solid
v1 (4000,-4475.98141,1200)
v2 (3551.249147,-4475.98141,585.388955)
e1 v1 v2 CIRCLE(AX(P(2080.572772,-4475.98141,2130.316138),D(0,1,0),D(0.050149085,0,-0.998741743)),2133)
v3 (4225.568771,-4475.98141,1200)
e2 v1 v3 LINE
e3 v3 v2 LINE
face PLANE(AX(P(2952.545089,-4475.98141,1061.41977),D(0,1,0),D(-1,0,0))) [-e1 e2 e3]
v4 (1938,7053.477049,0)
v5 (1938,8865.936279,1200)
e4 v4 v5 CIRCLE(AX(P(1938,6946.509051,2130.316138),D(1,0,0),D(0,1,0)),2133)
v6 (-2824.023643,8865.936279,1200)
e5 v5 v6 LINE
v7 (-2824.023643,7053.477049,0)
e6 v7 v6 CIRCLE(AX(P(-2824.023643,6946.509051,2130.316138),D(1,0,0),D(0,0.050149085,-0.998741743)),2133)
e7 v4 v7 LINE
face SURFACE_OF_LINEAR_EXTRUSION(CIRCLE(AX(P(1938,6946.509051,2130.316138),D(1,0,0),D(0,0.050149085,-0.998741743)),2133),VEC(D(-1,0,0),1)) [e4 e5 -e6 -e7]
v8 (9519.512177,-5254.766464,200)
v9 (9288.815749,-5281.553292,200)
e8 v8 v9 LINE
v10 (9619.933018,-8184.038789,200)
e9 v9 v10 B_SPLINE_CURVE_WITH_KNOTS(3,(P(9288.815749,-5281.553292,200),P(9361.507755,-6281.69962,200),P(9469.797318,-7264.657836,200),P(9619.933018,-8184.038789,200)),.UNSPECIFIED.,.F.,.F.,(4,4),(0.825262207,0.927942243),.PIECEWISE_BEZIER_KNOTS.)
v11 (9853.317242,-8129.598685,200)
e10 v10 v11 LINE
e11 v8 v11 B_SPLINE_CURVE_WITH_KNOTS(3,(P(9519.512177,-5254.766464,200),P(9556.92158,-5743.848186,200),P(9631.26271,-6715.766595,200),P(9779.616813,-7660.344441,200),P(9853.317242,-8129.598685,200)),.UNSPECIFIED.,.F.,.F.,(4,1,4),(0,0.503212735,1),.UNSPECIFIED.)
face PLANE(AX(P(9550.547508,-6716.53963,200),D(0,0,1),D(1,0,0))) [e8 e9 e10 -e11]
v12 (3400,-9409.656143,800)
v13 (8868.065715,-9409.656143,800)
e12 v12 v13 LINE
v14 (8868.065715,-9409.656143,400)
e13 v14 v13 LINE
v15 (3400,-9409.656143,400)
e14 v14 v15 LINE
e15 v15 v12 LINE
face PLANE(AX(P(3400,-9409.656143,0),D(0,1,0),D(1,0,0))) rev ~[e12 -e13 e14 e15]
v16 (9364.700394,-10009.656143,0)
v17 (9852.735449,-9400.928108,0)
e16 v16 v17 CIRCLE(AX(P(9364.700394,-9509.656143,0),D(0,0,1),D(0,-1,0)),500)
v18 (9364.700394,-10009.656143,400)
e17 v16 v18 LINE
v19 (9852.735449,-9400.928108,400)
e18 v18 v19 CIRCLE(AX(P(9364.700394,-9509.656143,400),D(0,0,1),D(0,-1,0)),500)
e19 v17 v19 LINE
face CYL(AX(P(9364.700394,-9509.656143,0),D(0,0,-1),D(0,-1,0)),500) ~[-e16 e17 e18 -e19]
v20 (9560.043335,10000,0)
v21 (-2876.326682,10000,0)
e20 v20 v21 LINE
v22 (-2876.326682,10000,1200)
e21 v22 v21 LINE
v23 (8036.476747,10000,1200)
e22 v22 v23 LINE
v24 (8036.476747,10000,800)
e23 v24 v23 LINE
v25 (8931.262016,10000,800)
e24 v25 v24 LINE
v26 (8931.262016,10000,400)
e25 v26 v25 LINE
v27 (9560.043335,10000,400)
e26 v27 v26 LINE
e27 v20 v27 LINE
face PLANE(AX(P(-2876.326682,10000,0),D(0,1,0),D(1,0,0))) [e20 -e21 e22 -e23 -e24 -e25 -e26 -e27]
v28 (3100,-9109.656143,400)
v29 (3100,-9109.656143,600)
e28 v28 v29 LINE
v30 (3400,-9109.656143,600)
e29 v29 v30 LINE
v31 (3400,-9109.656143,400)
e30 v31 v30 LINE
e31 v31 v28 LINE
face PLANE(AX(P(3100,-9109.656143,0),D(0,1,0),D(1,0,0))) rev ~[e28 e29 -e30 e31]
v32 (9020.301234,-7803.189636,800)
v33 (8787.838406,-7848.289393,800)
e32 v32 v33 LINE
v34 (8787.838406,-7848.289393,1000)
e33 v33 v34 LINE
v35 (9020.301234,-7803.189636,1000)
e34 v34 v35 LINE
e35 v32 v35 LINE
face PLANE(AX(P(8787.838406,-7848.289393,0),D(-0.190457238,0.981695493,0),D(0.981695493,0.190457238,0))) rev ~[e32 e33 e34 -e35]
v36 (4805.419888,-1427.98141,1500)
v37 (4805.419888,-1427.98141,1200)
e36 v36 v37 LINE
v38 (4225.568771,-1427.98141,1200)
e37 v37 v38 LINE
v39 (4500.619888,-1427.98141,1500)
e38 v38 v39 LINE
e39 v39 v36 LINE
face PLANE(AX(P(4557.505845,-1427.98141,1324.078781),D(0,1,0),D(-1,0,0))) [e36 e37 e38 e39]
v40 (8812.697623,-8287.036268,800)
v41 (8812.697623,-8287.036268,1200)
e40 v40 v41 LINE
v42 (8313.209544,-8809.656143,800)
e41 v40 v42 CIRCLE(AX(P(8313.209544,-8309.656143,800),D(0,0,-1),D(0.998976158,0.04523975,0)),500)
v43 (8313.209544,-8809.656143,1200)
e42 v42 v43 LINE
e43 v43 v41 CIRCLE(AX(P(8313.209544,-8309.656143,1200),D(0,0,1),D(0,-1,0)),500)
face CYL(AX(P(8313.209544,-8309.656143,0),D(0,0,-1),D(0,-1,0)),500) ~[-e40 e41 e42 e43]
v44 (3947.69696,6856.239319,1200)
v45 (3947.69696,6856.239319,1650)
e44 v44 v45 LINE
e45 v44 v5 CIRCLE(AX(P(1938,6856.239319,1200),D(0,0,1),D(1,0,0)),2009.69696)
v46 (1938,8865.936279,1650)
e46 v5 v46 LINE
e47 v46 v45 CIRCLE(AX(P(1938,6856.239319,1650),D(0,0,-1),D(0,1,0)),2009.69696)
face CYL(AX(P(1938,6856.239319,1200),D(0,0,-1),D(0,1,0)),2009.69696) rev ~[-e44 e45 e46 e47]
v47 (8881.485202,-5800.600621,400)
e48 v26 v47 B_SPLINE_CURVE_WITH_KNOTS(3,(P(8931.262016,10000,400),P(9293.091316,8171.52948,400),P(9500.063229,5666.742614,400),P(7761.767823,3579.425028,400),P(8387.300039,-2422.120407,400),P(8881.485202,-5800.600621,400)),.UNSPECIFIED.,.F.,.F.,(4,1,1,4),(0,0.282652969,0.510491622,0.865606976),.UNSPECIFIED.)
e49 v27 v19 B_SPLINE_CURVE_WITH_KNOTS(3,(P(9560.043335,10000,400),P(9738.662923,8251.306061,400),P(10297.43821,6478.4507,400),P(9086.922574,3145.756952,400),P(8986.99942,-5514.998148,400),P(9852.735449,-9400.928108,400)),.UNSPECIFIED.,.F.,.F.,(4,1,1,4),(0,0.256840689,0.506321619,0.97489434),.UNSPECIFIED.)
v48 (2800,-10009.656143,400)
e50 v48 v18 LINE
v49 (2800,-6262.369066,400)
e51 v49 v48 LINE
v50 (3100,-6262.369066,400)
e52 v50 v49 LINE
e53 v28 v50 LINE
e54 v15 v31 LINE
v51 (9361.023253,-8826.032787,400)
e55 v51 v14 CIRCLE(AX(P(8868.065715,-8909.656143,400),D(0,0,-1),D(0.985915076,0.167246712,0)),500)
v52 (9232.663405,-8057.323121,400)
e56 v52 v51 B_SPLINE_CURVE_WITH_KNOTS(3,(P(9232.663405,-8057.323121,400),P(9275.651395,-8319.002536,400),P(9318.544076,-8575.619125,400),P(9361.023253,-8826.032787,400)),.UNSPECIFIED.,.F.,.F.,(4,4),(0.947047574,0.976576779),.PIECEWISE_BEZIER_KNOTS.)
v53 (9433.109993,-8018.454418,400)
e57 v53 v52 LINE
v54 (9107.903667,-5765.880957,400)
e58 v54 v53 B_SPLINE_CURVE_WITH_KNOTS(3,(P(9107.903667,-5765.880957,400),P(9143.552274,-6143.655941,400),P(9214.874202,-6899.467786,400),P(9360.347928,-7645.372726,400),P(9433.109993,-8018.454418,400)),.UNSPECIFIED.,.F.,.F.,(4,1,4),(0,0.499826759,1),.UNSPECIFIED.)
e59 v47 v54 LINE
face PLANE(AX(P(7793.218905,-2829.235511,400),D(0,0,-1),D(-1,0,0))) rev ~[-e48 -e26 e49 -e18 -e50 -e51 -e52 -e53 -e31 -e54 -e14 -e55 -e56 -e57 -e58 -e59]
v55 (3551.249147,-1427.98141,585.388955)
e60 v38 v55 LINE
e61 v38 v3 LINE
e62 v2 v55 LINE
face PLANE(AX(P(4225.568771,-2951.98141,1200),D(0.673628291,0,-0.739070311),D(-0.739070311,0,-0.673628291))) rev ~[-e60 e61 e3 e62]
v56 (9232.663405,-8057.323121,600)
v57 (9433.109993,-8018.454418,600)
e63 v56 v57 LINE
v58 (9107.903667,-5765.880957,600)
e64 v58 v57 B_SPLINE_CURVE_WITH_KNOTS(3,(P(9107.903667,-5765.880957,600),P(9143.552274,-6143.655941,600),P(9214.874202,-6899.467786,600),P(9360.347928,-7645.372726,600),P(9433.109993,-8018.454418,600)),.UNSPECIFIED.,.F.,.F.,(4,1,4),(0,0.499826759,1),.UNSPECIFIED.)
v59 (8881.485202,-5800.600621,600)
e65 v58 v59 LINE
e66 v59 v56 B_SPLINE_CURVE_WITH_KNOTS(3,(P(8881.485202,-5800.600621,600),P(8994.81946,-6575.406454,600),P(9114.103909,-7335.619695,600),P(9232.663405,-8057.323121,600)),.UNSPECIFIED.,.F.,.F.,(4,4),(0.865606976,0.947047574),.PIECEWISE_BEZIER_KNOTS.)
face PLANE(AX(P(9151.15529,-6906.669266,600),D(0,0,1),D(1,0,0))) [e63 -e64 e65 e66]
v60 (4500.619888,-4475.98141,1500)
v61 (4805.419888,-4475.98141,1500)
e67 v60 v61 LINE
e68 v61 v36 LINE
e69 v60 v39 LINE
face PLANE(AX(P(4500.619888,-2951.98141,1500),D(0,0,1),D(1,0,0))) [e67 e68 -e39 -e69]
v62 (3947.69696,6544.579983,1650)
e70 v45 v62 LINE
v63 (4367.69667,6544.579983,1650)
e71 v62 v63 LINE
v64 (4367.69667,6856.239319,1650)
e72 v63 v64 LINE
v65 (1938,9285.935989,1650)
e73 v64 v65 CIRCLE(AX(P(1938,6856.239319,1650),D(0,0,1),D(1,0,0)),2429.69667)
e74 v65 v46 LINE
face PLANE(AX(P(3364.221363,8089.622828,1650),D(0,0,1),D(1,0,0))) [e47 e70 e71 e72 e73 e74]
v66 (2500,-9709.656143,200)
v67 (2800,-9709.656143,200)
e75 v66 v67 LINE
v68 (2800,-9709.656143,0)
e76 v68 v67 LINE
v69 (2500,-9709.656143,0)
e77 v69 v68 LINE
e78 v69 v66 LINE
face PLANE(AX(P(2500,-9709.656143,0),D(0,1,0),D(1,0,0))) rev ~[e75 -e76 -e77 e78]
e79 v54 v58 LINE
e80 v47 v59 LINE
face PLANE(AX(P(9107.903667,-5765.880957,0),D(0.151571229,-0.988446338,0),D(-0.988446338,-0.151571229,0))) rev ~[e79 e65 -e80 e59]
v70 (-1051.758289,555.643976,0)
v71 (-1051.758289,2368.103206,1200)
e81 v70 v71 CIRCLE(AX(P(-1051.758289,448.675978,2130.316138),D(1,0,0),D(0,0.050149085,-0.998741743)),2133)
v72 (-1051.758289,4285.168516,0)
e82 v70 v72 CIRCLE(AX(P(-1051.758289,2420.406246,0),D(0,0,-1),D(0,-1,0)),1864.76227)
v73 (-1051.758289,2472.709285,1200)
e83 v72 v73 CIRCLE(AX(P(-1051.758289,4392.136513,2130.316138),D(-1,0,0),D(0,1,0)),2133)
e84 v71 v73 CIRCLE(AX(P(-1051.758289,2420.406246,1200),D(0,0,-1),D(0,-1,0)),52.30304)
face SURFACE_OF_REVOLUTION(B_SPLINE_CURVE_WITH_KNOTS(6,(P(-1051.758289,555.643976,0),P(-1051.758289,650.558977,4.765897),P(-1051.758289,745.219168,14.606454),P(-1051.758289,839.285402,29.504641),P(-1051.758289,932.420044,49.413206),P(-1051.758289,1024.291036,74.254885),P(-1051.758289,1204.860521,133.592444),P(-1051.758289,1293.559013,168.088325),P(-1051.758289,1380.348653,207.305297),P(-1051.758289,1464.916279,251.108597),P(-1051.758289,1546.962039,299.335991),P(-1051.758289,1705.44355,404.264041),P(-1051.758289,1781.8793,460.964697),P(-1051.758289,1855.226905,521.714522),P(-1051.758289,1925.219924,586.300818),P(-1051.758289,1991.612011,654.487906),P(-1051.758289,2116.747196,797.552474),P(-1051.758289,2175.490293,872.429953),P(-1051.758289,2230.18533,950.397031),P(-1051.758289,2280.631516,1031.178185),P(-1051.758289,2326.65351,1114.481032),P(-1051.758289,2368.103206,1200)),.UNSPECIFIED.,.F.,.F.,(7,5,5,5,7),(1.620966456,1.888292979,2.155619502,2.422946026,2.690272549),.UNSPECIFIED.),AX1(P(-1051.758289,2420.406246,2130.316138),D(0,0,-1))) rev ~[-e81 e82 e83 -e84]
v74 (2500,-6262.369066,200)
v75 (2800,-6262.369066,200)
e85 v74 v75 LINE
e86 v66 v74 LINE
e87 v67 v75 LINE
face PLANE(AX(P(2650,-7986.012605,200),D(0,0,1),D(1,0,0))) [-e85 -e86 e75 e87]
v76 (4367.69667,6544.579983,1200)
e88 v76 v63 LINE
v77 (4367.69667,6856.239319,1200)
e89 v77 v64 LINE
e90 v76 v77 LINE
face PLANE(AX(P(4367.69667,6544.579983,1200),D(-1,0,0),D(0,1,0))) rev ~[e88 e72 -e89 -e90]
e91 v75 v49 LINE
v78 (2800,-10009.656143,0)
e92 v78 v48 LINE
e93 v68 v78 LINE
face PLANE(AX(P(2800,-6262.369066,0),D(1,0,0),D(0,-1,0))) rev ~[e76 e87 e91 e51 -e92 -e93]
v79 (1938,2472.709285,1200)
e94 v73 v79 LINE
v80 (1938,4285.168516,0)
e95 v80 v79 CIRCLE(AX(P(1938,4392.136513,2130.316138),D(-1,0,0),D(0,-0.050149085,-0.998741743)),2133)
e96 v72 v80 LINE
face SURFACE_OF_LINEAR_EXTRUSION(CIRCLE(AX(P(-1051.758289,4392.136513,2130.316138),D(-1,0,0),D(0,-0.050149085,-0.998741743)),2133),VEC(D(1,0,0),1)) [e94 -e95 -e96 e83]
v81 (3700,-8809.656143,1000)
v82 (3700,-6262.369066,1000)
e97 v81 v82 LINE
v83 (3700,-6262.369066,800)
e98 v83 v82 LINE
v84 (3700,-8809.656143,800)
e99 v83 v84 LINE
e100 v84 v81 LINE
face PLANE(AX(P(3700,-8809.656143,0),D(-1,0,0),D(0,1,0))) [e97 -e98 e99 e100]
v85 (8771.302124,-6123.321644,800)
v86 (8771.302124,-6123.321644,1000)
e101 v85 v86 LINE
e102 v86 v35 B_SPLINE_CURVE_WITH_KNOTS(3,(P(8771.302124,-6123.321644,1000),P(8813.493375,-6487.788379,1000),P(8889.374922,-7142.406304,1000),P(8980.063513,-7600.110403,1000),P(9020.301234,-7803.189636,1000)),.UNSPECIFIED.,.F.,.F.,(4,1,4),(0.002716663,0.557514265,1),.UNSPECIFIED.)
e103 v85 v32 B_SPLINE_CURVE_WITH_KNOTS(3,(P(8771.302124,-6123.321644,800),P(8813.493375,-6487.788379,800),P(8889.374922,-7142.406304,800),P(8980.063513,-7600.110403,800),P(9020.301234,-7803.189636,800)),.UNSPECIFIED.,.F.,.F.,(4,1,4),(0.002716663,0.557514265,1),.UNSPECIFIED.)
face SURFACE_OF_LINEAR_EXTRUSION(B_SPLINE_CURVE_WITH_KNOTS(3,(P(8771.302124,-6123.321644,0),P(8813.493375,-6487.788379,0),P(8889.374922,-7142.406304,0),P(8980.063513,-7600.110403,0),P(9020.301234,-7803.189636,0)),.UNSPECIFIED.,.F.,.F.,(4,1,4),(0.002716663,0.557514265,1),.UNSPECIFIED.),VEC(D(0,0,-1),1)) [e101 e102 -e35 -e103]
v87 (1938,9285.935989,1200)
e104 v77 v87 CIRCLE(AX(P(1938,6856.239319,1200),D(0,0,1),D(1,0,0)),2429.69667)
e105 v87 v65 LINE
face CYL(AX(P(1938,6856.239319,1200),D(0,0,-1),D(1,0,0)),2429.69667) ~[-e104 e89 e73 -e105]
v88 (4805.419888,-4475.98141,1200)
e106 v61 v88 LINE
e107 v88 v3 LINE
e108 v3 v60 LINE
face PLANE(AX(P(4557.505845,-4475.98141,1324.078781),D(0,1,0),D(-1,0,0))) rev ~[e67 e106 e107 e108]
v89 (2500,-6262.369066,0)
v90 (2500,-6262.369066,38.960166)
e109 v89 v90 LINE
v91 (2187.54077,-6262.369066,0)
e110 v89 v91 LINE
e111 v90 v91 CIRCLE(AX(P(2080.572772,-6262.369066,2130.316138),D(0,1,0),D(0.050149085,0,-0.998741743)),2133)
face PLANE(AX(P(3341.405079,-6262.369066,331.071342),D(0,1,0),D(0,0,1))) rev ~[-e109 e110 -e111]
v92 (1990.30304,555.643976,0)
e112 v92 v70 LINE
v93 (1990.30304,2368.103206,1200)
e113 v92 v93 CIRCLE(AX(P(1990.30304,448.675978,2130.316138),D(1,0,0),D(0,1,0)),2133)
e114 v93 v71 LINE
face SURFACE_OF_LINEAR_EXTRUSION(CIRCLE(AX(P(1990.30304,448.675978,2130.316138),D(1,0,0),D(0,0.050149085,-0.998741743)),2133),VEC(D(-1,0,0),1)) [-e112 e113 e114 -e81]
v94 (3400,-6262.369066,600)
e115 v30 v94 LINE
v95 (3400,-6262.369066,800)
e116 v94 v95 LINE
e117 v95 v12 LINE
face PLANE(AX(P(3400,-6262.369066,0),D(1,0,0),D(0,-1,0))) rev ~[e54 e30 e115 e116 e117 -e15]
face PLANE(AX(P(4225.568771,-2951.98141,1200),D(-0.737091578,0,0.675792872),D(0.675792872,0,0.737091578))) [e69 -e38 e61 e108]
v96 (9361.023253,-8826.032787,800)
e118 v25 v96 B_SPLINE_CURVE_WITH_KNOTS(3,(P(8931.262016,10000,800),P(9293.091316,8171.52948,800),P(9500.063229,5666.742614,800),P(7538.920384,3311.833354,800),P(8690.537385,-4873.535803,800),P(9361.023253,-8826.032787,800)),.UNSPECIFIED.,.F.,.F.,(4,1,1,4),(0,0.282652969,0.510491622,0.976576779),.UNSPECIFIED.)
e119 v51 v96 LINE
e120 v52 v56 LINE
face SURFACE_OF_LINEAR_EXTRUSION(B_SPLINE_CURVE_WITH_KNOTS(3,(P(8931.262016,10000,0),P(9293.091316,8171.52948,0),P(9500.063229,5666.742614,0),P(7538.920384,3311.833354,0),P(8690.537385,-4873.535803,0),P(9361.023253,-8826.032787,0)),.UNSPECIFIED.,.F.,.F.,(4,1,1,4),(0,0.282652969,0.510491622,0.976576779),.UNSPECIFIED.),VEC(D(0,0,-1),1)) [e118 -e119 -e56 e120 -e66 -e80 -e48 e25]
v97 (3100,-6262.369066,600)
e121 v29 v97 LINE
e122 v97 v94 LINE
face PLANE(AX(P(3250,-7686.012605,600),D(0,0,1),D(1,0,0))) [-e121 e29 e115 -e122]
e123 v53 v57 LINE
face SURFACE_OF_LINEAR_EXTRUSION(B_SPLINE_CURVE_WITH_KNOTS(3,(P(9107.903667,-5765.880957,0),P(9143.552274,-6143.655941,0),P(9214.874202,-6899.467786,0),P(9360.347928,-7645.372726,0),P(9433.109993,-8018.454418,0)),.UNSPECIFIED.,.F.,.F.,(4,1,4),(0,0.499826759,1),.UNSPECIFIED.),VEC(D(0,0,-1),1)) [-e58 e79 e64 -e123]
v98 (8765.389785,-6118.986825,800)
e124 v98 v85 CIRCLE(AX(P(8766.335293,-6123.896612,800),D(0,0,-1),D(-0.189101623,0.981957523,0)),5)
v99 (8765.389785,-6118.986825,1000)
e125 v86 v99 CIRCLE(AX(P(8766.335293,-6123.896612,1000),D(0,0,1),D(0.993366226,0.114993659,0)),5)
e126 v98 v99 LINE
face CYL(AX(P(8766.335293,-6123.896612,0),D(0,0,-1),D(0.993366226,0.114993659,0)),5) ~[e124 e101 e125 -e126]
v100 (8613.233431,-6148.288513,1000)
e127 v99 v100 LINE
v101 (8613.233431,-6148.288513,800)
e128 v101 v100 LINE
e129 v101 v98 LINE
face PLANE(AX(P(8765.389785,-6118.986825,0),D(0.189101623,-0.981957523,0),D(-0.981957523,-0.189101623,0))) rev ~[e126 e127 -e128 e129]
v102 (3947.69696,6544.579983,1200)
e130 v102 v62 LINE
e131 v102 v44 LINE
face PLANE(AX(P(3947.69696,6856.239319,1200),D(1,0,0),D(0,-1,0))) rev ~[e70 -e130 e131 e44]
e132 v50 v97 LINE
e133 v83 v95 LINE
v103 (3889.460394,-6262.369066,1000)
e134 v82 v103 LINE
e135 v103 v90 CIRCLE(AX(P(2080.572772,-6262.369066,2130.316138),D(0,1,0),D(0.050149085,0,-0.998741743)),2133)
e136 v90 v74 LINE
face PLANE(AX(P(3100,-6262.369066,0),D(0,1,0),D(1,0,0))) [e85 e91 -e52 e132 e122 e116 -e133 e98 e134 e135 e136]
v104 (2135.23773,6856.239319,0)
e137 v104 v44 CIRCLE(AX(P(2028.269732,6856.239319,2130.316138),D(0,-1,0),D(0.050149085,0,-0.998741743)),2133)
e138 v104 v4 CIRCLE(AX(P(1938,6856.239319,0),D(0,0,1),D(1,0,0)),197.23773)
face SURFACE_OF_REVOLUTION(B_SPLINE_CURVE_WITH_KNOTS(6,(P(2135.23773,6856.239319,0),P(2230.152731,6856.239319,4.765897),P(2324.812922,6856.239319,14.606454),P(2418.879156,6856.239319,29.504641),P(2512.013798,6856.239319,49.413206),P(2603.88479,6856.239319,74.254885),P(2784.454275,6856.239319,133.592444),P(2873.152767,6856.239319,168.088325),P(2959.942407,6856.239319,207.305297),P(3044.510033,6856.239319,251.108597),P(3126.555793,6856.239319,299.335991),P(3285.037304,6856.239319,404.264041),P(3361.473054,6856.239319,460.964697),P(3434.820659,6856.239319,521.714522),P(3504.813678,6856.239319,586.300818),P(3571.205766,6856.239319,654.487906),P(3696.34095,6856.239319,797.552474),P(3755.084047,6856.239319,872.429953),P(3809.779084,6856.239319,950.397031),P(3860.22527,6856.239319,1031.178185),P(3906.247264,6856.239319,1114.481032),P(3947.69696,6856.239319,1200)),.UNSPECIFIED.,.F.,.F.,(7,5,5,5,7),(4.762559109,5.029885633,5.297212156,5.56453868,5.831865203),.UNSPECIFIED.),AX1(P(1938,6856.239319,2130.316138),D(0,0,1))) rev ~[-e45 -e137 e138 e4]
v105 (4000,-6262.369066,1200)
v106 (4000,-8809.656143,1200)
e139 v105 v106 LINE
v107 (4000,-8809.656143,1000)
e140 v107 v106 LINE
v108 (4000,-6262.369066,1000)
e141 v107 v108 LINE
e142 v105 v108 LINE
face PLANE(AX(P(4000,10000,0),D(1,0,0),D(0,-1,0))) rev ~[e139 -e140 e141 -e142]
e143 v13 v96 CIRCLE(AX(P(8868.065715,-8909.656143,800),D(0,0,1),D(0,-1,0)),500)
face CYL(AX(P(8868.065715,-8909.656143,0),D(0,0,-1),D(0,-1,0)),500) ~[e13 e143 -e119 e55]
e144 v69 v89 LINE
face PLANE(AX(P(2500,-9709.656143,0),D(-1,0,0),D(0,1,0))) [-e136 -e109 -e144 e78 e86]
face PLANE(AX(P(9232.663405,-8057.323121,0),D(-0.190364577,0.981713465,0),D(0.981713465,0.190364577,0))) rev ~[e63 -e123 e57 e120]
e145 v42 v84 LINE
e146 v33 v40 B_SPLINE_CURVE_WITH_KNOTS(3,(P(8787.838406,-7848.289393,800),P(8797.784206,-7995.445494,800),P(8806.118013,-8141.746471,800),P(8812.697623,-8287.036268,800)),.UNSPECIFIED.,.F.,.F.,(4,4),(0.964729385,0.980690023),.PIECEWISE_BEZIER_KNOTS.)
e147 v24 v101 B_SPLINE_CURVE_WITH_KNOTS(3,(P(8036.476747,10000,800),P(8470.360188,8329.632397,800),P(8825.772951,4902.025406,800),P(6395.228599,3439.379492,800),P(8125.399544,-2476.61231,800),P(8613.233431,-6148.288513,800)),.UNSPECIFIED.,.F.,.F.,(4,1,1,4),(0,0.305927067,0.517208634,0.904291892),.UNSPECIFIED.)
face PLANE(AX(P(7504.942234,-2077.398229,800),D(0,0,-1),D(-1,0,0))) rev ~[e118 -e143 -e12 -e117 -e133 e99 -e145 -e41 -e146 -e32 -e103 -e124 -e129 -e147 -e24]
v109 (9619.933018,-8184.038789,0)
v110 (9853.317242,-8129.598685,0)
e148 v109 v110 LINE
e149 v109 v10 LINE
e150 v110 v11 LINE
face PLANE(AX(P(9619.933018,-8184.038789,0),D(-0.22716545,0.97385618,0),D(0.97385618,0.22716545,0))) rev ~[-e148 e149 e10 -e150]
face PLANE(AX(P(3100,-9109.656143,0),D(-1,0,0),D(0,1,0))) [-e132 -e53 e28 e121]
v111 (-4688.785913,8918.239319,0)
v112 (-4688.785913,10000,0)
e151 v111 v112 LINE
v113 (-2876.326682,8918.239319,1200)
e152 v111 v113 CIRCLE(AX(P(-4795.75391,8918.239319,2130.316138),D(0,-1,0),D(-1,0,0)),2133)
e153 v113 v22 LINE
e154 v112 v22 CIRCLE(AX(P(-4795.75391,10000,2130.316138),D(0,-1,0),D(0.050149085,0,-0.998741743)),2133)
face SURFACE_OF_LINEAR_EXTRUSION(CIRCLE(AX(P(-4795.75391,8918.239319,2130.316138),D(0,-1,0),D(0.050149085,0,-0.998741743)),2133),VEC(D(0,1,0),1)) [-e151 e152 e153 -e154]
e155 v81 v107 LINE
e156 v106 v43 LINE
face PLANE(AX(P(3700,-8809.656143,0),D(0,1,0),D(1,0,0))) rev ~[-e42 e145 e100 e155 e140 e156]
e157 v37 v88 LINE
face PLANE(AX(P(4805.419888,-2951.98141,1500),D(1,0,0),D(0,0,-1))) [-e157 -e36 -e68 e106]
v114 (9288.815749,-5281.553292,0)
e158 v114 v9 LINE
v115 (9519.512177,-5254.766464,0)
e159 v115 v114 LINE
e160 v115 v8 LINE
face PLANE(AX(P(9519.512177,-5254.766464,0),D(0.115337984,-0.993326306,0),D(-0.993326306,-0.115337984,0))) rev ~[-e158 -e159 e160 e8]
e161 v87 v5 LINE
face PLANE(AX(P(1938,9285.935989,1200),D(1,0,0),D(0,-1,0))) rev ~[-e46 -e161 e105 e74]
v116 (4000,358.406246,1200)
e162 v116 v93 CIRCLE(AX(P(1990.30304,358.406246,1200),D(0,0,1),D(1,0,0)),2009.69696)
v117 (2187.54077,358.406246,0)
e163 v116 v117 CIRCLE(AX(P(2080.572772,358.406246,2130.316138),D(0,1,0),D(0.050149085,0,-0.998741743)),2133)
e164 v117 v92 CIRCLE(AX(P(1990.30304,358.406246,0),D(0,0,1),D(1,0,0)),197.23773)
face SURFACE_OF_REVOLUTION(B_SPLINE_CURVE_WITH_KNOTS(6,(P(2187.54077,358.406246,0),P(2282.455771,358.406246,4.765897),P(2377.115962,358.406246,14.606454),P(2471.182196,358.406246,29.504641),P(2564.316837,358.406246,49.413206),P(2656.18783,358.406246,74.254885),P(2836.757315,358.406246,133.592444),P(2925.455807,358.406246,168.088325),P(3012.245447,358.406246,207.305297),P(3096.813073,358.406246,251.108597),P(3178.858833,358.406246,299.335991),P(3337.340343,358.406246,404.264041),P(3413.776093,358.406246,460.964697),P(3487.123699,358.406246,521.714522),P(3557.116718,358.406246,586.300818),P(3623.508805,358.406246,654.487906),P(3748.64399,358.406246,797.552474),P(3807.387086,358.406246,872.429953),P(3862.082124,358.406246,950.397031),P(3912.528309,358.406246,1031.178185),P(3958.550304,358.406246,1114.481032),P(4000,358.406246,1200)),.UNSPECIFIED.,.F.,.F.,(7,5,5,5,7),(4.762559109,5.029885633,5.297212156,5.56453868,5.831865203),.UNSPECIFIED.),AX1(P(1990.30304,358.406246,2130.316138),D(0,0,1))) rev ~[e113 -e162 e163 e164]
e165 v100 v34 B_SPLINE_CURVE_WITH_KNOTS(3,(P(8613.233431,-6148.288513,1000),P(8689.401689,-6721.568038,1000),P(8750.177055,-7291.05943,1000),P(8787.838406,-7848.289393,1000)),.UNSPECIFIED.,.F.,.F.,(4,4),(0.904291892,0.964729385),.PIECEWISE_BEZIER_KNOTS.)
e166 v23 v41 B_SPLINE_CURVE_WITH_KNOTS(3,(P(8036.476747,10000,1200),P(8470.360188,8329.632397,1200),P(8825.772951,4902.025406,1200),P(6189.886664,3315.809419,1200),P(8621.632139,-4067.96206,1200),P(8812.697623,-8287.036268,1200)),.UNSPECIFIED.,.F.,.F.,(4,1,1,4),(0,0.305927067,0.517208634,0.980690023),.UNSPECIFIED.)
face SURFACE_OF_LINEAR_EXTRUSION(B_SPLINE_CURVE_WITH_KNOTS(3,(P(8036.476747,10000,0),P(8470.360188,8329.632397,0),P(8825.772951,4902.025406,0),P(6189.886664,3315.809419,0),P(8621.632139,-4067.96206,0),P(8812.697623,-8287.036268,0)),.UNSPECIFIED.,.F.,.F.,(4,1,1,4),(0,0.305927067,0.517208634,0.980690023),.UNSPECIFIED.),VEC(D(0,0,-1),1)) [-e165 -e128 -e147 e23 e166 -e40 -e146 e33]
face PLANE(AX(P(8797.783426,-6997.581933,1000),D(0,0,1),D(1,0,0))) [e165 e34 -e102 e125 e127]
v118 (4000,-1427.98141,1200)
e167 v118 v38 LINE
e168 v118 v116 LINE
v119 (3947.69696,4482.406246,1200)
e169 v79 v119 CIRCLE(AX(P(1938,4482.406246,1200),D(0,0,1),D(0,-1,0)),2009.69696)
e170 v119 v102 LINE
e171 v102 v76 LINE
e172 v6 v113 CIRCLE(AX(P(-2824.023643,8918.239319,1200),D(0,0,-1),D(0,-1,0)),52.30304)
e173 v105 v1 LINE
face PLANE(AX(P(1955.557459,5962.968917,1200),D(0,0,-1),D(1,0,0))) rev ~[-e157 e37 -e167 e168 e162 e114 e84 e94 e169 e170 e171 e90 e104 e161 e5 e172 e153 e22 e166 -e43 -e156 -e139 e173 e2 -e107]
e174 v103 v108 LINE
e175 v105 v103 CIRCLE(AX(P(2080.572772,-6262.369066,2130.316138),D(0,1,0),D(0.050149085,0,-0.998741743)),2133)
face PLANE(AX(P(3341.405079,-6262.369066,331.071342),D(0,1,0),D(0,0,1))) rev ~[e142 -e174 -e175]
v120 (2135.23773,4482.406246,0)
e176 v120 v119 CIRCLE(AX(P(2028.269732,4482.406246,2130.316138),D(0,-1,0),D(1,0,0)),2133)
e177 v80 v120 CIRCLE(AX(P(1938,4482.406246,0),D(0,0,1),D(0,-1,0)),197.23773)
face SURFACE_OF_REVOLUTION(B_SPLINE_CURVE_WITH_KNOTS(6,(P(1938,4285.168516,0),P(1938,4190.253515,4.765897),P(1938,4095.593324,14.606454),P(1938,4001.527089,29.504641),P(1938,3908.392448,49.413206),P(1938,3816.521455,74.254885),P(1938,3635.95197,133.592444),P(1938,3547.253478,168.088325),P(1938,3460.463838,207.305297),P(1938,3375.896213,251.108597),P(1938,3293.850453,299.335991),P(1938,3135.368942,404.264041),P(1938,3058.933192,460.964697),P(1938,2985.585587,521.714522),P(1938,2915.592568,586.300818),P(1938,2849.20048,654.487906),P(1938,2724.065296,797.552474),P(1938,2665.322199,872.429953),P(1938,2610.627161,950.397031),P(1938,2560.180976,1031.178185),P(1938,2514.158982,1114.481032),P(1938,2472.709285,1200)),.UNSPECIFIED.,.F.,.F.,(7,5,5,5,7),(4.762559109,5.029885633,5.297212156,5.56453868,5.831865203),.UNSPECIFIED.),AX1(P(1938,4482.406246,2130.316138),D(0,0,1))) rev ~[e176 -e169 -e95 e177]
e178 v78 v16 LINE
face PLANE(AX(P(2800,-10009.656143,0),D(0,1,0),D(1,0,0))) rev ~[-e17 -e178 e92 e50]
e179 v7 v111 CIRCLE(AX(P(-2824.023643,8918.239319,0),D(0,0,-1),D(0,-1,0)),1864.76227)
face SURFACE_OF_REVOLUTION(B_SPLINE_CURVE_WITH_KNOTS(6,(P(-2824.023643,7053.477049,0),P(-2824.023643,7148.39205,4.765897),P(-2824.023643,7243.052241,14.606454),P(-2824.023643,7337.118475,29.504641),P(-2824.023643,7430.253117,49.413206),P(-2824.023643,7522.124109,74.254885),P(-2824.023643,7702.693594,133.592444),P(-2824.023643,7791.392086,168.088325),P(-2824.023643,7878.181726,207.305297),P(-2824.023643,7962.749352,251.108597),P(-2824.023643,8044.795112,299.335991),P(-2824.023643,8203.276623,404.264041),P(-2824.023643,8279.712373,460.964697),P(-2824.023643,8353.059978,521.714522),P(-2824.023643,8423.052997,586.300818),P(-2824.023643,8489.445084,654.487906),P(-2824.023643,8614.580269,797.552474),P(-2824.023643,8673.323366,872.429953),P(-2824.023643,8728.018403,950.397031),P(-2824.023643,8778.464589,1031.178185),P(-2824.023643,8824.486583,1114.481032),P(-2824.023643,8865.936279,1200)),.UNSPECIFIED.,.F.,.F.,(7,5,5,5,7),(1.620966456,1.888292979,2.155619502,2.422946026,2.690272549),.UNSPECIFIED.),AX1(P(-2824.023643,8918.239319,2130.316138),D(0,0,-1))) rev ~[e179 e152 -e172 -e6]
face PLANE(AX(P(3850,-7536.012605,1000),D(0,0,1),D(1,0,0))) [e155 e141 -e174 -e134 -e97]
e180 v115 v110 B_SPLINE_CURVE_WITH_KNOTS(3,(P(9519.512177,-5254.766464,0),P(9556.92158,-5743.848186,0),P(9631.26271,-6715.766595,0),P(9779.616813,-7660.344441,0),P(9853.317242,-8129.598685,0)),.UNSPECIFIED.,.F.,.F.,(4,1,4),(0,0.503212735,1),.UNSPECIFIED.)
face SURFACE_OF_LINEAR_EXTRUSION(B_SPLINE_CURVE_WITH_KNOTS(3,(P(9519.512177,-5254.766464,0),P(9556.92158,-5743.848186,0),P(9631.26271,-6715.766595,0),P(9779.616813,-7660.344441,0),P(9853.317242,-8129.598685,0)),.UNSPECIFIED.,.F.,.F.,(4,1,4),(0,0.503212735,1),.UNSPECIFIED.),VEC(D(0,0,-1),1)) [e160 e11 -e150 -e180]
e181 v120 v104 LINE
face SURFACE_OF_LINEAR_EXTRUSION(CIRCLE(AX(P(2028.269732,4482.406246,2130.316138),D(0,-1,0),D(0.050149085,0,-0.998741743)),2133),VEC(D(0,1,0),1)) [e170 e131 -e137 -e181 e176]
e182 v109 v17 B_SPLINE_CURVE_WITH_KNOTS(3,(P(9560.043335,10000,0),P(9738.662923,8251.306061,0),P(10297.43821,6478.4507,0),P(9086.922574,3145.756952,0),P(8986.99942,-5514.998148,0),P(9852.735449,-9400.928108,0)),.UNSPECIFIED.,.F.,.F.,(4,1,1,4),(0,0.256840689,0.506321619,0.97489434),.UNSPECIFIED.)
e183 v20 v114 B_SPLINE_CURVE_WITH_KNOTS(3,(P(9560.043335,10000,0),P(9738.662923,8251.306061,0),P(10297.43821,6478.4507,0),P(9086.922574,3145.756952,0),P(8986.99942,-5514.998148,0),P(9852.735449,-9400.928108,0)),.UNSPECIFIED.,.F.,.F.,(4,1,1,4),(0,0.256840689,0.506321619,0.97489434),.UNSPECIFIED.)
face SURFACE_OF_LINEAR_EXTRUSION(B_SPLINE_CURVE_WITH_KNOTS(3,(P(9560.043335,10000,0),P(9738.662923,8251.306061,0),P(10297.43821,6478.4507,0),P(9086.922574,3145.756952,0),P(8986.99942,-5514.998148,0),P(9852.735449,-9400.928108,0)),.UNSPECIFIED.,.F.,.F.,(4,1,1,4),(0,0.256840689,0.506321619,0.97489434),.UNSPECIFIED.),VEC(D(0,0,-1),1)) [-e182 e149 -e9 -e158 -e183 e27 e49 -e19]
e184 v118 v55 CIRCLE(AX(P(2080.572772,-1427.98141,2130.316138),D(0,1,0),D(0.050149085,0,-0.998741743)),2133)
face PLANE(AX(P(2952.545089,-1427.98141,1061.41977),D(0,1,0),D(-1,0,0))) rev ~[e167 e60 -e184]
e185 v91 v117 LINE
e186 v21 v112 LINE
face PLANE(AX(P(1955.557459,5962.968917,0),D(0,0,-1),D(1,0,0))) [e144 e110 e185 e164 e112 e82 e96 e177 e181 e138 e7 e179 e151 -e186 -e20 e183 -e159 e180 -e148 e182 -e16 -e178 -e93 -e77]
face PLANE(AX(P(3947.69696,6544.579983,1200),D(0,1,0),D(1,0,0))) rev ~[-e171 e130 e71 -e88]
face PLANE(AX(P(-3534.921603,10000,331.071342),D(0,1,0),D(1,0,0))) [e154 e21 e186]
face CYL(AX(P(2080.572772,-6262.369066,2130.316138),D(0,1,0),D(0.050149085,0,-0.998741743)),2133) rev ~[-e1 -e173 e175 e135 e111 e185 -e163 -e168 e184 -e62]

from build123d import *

# Parameters (mm, degrees)
F1_DEPTH  = 1200
F0_W      = 300
F0_H      = 2547.2870769622
F2_DEPTH  = 1000
F3_DEPTH  = 800
F4_DEPTH  = 400
F0_H_2    = 3447.2870769622
F5_DEPTH  = 200
F0_H_3    = 2847.2870769622
F6_DEPTH  = 600
F7_DEPTH  = 200
F8_DEPTH  = 600
F9_DEPTH  = 1000
F16_DEPTH = 1524
F17_DEPTH = 1524
F19_DEPTH = 1200
F21_DEPTH = 450


# Not quite as in the source:
# - a feature names something its author has since deleted; it is built from what else it names


with BuildPart() as f1:
    # F0 (on Top) → F1 (new body)
    with BuildSketch(Plane.XY):
        with BuildLine():
            add(Edge.make_bspline(
                [(8036.4767474961, 10000), (8470.360187732, 8329.6323969196), (8825.7729510838, 4902.0254055318), (6395.2285988216, 3439.3794917817), (8125.3995442021, -2476.6123096312), (8613.2334310908, -6148.2885131691)],
                knots=[0, 0, 0, 0, 0.3059270672, 0.5172086345, 0.9042918919, 0.9042918919, 0.9042918919, 0.9042918919], degree=3))
            Line((8036.4767474961, 10000), (4000, 10000))
            Line((4000, 10000), (4000, -6262.3690662263))
            Line((4000, -6262.3690662263), (4000, -8809.6561431885))
            Line((4000, -8809.6561431885), (8313.2095440952, -8809.6561431885))
            ThreePointArc((8313.2095440952, -8809.6561431885), (8674.6718087547, -8655.1196452075), (8812.6976232832, -8287.0362680974))
            add(Edge.make_bspline(
                [(8787.8384059317, -7848.2893931684), (8797.784205551, -7995.4454937091), (8806.1180126829, -8141.7464710797), (8812.6976232832, -8287.0362680974)],
                knots=[0.9647293852, 0.9647293852, 0.9647293852, 0.9647293852, 0.9806900234, 0.9806900234, 0.9806900234, 0.9806900234], degree=3))
            add(Edge.make_bspline(
                [(8613.2334310908, -6148.2885131691), (8689.4016886612, -6721.5680378242), (8750.1770548915, -7291.0594295347), (8787.8384059317, -7848.2893931684)],
                knots=[0.9042918919, 0.9042918919, 0.9042918919, 0.9042918919, 0.9647293852, 0.9647293852, 0.9647293852, 0.9647293852], degree=3))
        make_face()
    extrude(amount=F1_DEPTH)

    # F0 (on Top) → F2 (join)
    with BuildSketch(Plane.XY):
        with Locations((3850, -7536.0126047074)):
            Rectangle(F0_W, F0_H)
    extrude(amount=F2_DEPTH)

    # F0 (on Top) → F3 (join)
    with BuildSketch(Plane.XY):
        with BuildLine():
            add(Edge.make_bspline(
                [(8931.2620162964, 10000), (9293.0913160754, 8171.5294795271), (9500.0632293716, 5666.7426139981), (7761.7678229589, 3579.4250276228), (8387.3000385547, -2422.1204070051), (8881.4852022515, -5800.6006208613)],
                knots=[0, 0, 0, 0, 0.2826529688, 0.5104916215, 0.8656069765, 0.8656069765, 0.8656069765, 0.8656069765], degree=3))
            Line((8931.2620162964, 10000), (8036.4767474961, 10000))
            add(Edge.make_bspline(
                [(8036.4767474961, 10000), (8470.360187732, 8329.6323969196), (8825.7729510838, 4902.0254055318), (6395.2285988216, 3439.3794917817), (8125.3995442021, -2476.6123096312), (8613.2334310908, -6148.2885131691)],
                knots=[0, 0, 0, 0, 0.3059270672, 0.5172086345, 0.9042918919, 0.9042918919, 0.9042918919, 0.9042918919], degree=3))
            Line((8613.2334310908, -6148.2885131691), (8765.3897849551, -6118.9868246126))
            ThreePointArc((8765.3897849551, -6118.9868246126), (8769.2917139348, -6119.8642958095), (8771.3021241999, -6123.3216439306))
            add(Edge.make_bspline(
                [(8771.3021241999, -6123.3216439306), (8813.4933748329, -6487.7883786699), (8889.3749215397, -7142.4063040065), (8980.0635134111, -7600.1104032829), (9020.3012339996, -7803.1896360599)],
                knots=[0.0027166629, 0.0027166629, 0.0027166629, 0.0027166629, 0.5575142646, 1, 1, 1, 1], degree=3))
            Line((9020.3012339996, -7803.1896360599), (8787.8384059317, -7848.2893931684))
            add(Edge.make_bspline(
                [(8787.8384059317, -7848.2893931684), (8797.784205551, -7995.4454937091), (8806.1180126829, -8141.7464710797), (8812.6976232832, -8287.0362680974)],
                knots=[0.9647293852, 0.9647293852, 0.9647293852, 0.9647293852, 0.9806900234, 0.9806900234, 0.9806900234, 0.9806900234], degree=3))
            ThreePointArc((8812.6976232832, -8287.0362680974), (8674.6718087547, -8655.1196452075), (8313.2095440952, -8809.6561431885))
            Line((8313.2095440952, -8809.6561431885), (4000, -8809.6561431885))
            Line((4000, -8809.6561431885), (3700, -8809.6561431885))
            Line((3700, -8809.6561431885), (3700, -6262.3690662263))
            Line((3700, -6262.3690662263), (3400, -6262.3690662263))
            Line((3400, -6262.3690662263), (3400, -9109.6561431885))
            Line((3400, -9109.6561431885), (3400, -9409.6561431885))
            Line((3400, -9409.6561431885), (8868.0657153652, -9409.6561431885))
            ThreePointArc((8868.0657153652, -9409.6561431885), (9250.0419437511, -9232.2924104432), (9361.0232533911, -8826.0327869808))
            add(Edge.make_bspline(
                [(9232.6634049447, -8057.3231214569), (9275.6513945538, -8319.0025360325), (9318.5440756349, -8575.6191246537), (9361.0232533911, -8826.0327869808)],
                knots=[0.9470475744, 0.9470475744, 0.9470475744, 0.9470475744, 0.9765767788, 0.9765767788, 0.9765767788, 0.9765767788], degree=3))
            add(Edge.make_bspline(
                [(8881.4852022515, -5800.6006208613), (8994.8194600953, -6575.4064543937), (9114.1039092929, -7335.6196946013), (9232.6634049447, -8057.3231214569)],
                knots=[0.8656069765, 0.8656069765, 0.8656069765, 0.8656069765, 0.9470475744, 0.9470475744, 0.9470475744, 0.9470475744], degree=3))
        make_face()
        with Locations((3850, -7536.0126047074)):
            Rectangle(F0_W, F0_H)
    extrude(amount=F3_DEPTH)

    # F0 (on Top) → F4 (join)
    with BuildSketch(Plane.XY):
        with BuildLine():
            add(Edge.make_bspline(
                [(9560.0433349609, 10000), (9738.6629226993, 8251.3060611052), (10297.4382102532, 6478.450699769), (9272.7191558649, 3657.2770747912), (9063.0227701453, -2174.939075243), (9288.8157490666, -5281.5532921831)],
                knots=[0, 0, 0, 0, 0.2568406889, 0.506321619, 0.8252622074, 0.8252622074, 0.8252622074, 0.8252622074], degree=3))
            Line((9560.0433349609, 10000), (8931.2620162964, 10000))
            add(Edge.make_bspline(
                [(8931.2620162964, 10000), (9293.0913160754, 8171.5294795271), (9500.0632293716, 5666.7426139981), (7761.7678229589, 3579.4250276228), (8387.3000385547, -2422.1204070051), (8881.4852022515, -5800.6006208613)],
                knots=[0, 0, 0, 0, 0.2826529688, 0.5104916215, 0.8656069765, 0.8656069765, 0.8656069765, 0.8656069765], degree=3))
            Line((8881.4852022515, -5800.6006208613), (9107.9036665642, -5765.8809567214))
            add(Edge.make_bspline(
                [(9107.9036665642, -5765.8809567214), (9143.5522743599, -6143.655941097), (9214.8742017644, -6899.4677855656), (9360.3479276578, -7645.3727259321), (9433.1099926681, -8018.4544176886)],
                knots=[0, 0, 0, 0, 0.4998267587, 1, 1, 1, 1], degree=3))
            Line((9433.1099926681, -8018.4544176886), (9232.6634049447, -8057.3231214569))
            add(Edge.make_bspline(
                [(9232.6634049447, -8057.3231214569), (9275.6513945538, -8319.0025360325), (9318.5440756349, -8575.6191246537), (9361.0232533911, -8826.0327869808)],
                knots=[0.9470475744, 0.9470475744, 0.9470475744, 0.9470475744, 0.9765767788, 0.9765767788, 0.9765767788, 0.9765767788], degree=3))
            ThreePointArc((9361.0232533911, -8826.0327869808), (9250.0419437511, -9232.2924104432), (8868.0657153652, -9409.6561431885))
            Line((8868.0657153652, -9409.6561431885), (3400, -9409.6561431885))
            Line((3400, -9409.6561431885), (3400, -9109.6561431885))
            Line((3400, -9109.6561431885), (3100, -9109.6561431885))
            Line((3100, -9109.6561431885), (3100, -6262.3690662263))
            Line((3100, -6262.3690662263), (2800, -6262.3690662263))
            Line((2800, -6262.3690662263), (2800, -9709.6561431885))
            Line((2800, -9709.6561431885), (2800, -10009.6561431885))
            Line((2800, -10009.6561431885), (9364.7003943114, -10009.6561431885))
            ThreePointArc((9364.7003943114, -10009.6561431885), (9754.8055196615, -9822.4148220059), (9852.735448729, -9400.928107891))
            add(Edge.make_bspline(
                [(9619.9330184672, -8184.0387894501), (9688.5849810725, -8604.4405106021), (9765.9866472577, -9011.5487180137), (9852.735448729, -9400.928107891)],
                knots=[0.927942243, 0.927942243, 0.927942243, 0.927942243, 0.9748943399, 0.9748943399, 0.9748943399, 0.9748943399], degree=3))
            add(Edge.make_bspline(
                [(9288.8157490666, -5281.5532921831), (9361.507754855, -6281.6996196687), (9469.7973180649, -7264.6578357211), (9619.9330184672, -8184.0387894501)],
                knots=[0.8252622074, 0.8252622074, 0.8252622074, 0.8252622074, 0.927942243, 0.927942243, 0.927942243, 0.927942243], degree=3))
        make_face()
    extrude(amount=F4_DEPTH)

    # F0 (on Top) → F5 (join)
    with BuildSketch(Plane.XY):
        with Locations((2650, -7986.0126047074)):
            Rectangle(F0_W, F0_H_2)
    extrude(amount=F5_DEPTH)

    # F0 (on Top) → F6 (join)
    with BuildSketch(Plane.XY):
        with Locations((3250, -7686.0126047074)):
            Rectangle(F0_W, F0_H_3)
    extrude(amount=F6_DEPTH)

    # F0 (on Top) → F7 (join)
    with BuildSketch(Plane.XY):
        with BuildLine():
            Line((9519.5121765137, -5254.7664642334), (9288.8157490666, -5281.5532921831))
            add(Edge.make_bspline(
                [(9288.8157490666, -5281.5532921831), (9361.507754855, -6281.6996196687), (9469.7973180649, -7264.6578357211), (9619.9330184672, -8184.0387894501)],
                knots=[0.8252622074, 0.8252622074, 0.8252622074, 0.8252622074, 0.927942243, 0.927942243, 0.927942243, 0.927942243], degree=3))
            Line((9619.9330184672, -8184.0387894501), (9853.3172420489, -8129.59868503))
            add(Edge.make_bspline(
                [(9519.5121765137, -5254.7664642334), (9556.921579776, -5743.8481856875), (9631.2627095363, -6715.7665951577), (9779.6168128683, -7660.3444408865), (9853.3172420489, -8129.59868503)],
                knots=[0, 0, 0, 0, 0.5032127354, 1, 1, 1, 1], degree=3))
        make_face()
    extrude(amount=F7_DEPTH)

    # F0 (on Top) → F8 (join)
    with BuildSketch(Plane.XY):
        with BuildLine():
            Line((9107.9036665642, -5765.8809567214), (8881.4852022515, -5800.6006208613))
            add(Edge.make_bspline(
                [(8881.4852022515, -5800.6006208613), (8994.8194600953, -6575.4064543937), (9114.1039092929, -7335.6196946013), (9232.6634049447, -8057.3231214569)],
                knots=[0.8656069765, 0.8656069765, 0.8656069765, 0.8656069765, 0.9470475744, 0.9470475744, 0.9470475744, 0.9470475744], degree=3))
            Line((9232.6634049447, -8057.3231214569), (9433.1099926681, -8018.4544176886))
            add(Edge.make_bspline(
                [(9107.9036665642, -5765.8809567214), (9143.5522743599, -6143.655941097), (9214.8742017644, -6899.4677855656), (9360.3479276578, -7645.3727259321), (9433.1099926681, -8018.4544176886)],
                knots=[0, 0, 0, 0, 0.4998267587, 1, 1, 1, 1], degree=3))
        make_face()
    extrude(amount=F8_DEPTH)

    # F0 (on Top) → F9 (join)
    with BuildSketch(Plane.XY):
        with BuildLine():
            Line((8765.3897849551, -6118.9868246126), (8613.2334310908, -6148.2885131691))
            add(Edge.make_bspline(
                [(8613.2334310908, -6148.2885131691), (8689.4016886612, -6721.5680378242), (8750.1770548915, -7291.0594295347), (8787.8384059317, -7848.2893931684)],
                knots=[0.9042918919, 0.9042918919, 0.9042918919, 0.9042918919, 0.9647293852, 0.9647293852, 0.9647293852, 0.9647293852], degree=3))
            Line((8787.8384059317, -7848.2893931684), (9020.3012339996, -7803.1896360599))
            add(Edge.make_bspline(
                [(8771.3021241999, -6123.3216439306), (8813.4933748329, -6487.7883786699), (8889.3749215397, -7142.4063040065), (8980.0635134111, -7600.1104032829), (9020.3012339996, -7803.1896360599)],
                knots=[0.0027166629, 0.0027166629, 0.0027166629, 0.0027166629, 0.5575142646, 1, 1, 1, 1], degree=3))
            ThreePointArc((8771.3021241999, -6123.3216439306), (8769.2917139348, -6119.8642958095), (8765.3897849551, -6118.9868246126))
        make_face()
    extrude(amount=F9_DEPTH)

    # F12: sweep along a path in F0
    with BuildLine(Plane.XY) as f12_path:
        Line((2240.3030395508, -6262.3690662263), (2240.3030395508, 358.4062457085))
        ThreePointArc((2240.3030395508, 358.4062457085), (2167.0797348474, 535.1829410051), (1990.3030395508, 608.4062457085))
        Line((1990.3030395508, 608.4062457085), (-1051.7582893372, 608.4062457085))
        ThreePointArc((-1051.7582893372, 608.4062457085), (-2863.7582893372, 2420.4062457085), (-1051.7582893372, 4232.4062457085))
        Line((-1051.7582893372, 4232.4062457085), (1938, 4232.4062457085))
        ThreePointArc((1938, 4232.4062457085), (2114.7766952966, 4305.6295504118), (2188, 4482.4062457085))
        Line((2188, 4482.4062457085), (2188, 6856.2393188477))
        ThreePointArc((2188, 6856.2393188477), (2114.7766952966, 7033.0160141443), (1938, 7106.2393188477))
        Line((1938, 7106.2393188477), (-2824.0236428859, 7106.2393188477))
        ThreePointArc((-2824.0236428859, 7106.2393188477), (-4105.3011303959, 7636.9618313376), (-4636.0236428859, 8918.2393188477))
        Line((-4636.0236428859, 8918.2393188477), (-4636.0236428859, 10000))
    # F11 (on line) → F12 (sweep)
    with BuildSketch(Plane(origin=(0, -6262.3690662263, 0), x_dir=(-1, 0, 0), z_dir=(0, 1, 0))):
        with BuildLine():
            ThreePointArc((-2187.540769577, 0), (-3258.099588071, 351.8000155689), (-4000, 1200))
            Line((-4000, 1200), (-4000, 1000))
            Line((-4000, 1000), (-4000, 0))
            Line((-4000, 0), (-2187.540769577, 0))
        make_face()
    sweep(path=f12_path.line)

    # F15 (on face) → F16 (join, symmetric)
    with BuildSketch(Plane(origin=(0, -2951.9814102589, 0), x_dir=(-1, 0, 0), z_dir=(0, 1, 0))):
        Polygon((-4225.5687713623, 1200), (-4500.6198883057, 1500), (-4805.4198883057, 1500), (-4805.4198883057, 1200), align=None)
    extrude(amount=F16_DEPTH, both=True)

    # F15 (on face) → F17 (cut, symmetric)
    with BuildSketch(Plane(origin=(0, -2951.9814102589, 0), x_dir=(-1, 0, 0), z_dir=(0, 1, 0))):
        Polygon((-3236.7072105408, 1854.6521663666), (-4225.5687713623, 1200), (-3485.6019020081, 525.5545377731), (-1603.2665967941, 735.3942990303), align=None)
    extrude(amount=F17_DEPTH, both=True, mode=Mode.SUBTRACT)

    # F18 (on face) → F19 (join)
    with BuildSketch(Plane(origin=(0, 0, 0), x_dir=(1, 0, 0), z_dir=(0, 0, -1))):
        with BuildLine():
            Line((-2876.3266824367, -10000), (4000, -10000))
            Line((4000, -10000), (4000, -358.4062457085))
            ThreePointArc((4000, -358.4062457085), (3411.3733884144, -1779.4765945721), (1990.3030395508, -2368.1032061577))
            Line((1990.3030395508, -2368.1032061577), (-1051.7582893372, -2368.1032061577))
            ThreePointArc((-1051.7582893372, -2368.1032061577), (-1104.0613288879, -2420.4062457085), (-1051.7582893372, -2472.7092852592))
            Line((-1051.7582893372, -2472.7092852592), (1938, -2472.7092852592))
            ThreePointArc((1938, -2472.7092852592), (3359.0703488636, -3061.3358968448), (3947.6969604492, -4482.4062457084))
            Line((3947.6969604492, -4482.4062457084), (3947.6969604492, -6856.2393188476))
            ThreePointArc((3947.6969604492, -6856.2393188476), (3359.0703488637, -8277.3096677112), (1938.0000000002, -8865.9362792969))
            Line((1938.0000000002, -8865.9362792969), (-2824.0236428857, -8865.9362792969))
            ThreePointArc((-2824.0236428857, -8865.9362792969), (-2861.0074768288, -8881.2554849045), (-2876.3266824367, -8918.2393188475))
            Line((-2876.3266824367, -8918.2393188475), (-2876.3266824367, -9999.9999999998))
        make_face()
    extrude(amount=-F19_DEPTH)

    # F20 (on face) → F21 (join)
    with BuildSketch(Plane.XY.offset(1200)):
        with BuildLine():
            ThreePointArc((1938, 8865.9362792969), (3359.0703488636, 8277.3096677113), (3947.6969604492, 6856.2393188477))
            Line((3947.6969604492, 6856.2393188477), (3947.6969604492, 6544.5799827576))
            Line((3947.6969604492, 6544.5799827576), (4367.6966701962, 6544.5799827576))
            Line((4367.6966701962, 6544.5799827576), (4367.6966701962, 6856.2393188477))
            ThreePointArc((4367.6966701962, 6856.2393188477), (3656.0549917221, 8574.2943105698), (1938, 9285.9359890439))
            Line((1938, 9285.9359890439), (1938, 8865.9362792969))
        make_face()
    extrude(amount=F21_DEPTH)


solid = f1.part
